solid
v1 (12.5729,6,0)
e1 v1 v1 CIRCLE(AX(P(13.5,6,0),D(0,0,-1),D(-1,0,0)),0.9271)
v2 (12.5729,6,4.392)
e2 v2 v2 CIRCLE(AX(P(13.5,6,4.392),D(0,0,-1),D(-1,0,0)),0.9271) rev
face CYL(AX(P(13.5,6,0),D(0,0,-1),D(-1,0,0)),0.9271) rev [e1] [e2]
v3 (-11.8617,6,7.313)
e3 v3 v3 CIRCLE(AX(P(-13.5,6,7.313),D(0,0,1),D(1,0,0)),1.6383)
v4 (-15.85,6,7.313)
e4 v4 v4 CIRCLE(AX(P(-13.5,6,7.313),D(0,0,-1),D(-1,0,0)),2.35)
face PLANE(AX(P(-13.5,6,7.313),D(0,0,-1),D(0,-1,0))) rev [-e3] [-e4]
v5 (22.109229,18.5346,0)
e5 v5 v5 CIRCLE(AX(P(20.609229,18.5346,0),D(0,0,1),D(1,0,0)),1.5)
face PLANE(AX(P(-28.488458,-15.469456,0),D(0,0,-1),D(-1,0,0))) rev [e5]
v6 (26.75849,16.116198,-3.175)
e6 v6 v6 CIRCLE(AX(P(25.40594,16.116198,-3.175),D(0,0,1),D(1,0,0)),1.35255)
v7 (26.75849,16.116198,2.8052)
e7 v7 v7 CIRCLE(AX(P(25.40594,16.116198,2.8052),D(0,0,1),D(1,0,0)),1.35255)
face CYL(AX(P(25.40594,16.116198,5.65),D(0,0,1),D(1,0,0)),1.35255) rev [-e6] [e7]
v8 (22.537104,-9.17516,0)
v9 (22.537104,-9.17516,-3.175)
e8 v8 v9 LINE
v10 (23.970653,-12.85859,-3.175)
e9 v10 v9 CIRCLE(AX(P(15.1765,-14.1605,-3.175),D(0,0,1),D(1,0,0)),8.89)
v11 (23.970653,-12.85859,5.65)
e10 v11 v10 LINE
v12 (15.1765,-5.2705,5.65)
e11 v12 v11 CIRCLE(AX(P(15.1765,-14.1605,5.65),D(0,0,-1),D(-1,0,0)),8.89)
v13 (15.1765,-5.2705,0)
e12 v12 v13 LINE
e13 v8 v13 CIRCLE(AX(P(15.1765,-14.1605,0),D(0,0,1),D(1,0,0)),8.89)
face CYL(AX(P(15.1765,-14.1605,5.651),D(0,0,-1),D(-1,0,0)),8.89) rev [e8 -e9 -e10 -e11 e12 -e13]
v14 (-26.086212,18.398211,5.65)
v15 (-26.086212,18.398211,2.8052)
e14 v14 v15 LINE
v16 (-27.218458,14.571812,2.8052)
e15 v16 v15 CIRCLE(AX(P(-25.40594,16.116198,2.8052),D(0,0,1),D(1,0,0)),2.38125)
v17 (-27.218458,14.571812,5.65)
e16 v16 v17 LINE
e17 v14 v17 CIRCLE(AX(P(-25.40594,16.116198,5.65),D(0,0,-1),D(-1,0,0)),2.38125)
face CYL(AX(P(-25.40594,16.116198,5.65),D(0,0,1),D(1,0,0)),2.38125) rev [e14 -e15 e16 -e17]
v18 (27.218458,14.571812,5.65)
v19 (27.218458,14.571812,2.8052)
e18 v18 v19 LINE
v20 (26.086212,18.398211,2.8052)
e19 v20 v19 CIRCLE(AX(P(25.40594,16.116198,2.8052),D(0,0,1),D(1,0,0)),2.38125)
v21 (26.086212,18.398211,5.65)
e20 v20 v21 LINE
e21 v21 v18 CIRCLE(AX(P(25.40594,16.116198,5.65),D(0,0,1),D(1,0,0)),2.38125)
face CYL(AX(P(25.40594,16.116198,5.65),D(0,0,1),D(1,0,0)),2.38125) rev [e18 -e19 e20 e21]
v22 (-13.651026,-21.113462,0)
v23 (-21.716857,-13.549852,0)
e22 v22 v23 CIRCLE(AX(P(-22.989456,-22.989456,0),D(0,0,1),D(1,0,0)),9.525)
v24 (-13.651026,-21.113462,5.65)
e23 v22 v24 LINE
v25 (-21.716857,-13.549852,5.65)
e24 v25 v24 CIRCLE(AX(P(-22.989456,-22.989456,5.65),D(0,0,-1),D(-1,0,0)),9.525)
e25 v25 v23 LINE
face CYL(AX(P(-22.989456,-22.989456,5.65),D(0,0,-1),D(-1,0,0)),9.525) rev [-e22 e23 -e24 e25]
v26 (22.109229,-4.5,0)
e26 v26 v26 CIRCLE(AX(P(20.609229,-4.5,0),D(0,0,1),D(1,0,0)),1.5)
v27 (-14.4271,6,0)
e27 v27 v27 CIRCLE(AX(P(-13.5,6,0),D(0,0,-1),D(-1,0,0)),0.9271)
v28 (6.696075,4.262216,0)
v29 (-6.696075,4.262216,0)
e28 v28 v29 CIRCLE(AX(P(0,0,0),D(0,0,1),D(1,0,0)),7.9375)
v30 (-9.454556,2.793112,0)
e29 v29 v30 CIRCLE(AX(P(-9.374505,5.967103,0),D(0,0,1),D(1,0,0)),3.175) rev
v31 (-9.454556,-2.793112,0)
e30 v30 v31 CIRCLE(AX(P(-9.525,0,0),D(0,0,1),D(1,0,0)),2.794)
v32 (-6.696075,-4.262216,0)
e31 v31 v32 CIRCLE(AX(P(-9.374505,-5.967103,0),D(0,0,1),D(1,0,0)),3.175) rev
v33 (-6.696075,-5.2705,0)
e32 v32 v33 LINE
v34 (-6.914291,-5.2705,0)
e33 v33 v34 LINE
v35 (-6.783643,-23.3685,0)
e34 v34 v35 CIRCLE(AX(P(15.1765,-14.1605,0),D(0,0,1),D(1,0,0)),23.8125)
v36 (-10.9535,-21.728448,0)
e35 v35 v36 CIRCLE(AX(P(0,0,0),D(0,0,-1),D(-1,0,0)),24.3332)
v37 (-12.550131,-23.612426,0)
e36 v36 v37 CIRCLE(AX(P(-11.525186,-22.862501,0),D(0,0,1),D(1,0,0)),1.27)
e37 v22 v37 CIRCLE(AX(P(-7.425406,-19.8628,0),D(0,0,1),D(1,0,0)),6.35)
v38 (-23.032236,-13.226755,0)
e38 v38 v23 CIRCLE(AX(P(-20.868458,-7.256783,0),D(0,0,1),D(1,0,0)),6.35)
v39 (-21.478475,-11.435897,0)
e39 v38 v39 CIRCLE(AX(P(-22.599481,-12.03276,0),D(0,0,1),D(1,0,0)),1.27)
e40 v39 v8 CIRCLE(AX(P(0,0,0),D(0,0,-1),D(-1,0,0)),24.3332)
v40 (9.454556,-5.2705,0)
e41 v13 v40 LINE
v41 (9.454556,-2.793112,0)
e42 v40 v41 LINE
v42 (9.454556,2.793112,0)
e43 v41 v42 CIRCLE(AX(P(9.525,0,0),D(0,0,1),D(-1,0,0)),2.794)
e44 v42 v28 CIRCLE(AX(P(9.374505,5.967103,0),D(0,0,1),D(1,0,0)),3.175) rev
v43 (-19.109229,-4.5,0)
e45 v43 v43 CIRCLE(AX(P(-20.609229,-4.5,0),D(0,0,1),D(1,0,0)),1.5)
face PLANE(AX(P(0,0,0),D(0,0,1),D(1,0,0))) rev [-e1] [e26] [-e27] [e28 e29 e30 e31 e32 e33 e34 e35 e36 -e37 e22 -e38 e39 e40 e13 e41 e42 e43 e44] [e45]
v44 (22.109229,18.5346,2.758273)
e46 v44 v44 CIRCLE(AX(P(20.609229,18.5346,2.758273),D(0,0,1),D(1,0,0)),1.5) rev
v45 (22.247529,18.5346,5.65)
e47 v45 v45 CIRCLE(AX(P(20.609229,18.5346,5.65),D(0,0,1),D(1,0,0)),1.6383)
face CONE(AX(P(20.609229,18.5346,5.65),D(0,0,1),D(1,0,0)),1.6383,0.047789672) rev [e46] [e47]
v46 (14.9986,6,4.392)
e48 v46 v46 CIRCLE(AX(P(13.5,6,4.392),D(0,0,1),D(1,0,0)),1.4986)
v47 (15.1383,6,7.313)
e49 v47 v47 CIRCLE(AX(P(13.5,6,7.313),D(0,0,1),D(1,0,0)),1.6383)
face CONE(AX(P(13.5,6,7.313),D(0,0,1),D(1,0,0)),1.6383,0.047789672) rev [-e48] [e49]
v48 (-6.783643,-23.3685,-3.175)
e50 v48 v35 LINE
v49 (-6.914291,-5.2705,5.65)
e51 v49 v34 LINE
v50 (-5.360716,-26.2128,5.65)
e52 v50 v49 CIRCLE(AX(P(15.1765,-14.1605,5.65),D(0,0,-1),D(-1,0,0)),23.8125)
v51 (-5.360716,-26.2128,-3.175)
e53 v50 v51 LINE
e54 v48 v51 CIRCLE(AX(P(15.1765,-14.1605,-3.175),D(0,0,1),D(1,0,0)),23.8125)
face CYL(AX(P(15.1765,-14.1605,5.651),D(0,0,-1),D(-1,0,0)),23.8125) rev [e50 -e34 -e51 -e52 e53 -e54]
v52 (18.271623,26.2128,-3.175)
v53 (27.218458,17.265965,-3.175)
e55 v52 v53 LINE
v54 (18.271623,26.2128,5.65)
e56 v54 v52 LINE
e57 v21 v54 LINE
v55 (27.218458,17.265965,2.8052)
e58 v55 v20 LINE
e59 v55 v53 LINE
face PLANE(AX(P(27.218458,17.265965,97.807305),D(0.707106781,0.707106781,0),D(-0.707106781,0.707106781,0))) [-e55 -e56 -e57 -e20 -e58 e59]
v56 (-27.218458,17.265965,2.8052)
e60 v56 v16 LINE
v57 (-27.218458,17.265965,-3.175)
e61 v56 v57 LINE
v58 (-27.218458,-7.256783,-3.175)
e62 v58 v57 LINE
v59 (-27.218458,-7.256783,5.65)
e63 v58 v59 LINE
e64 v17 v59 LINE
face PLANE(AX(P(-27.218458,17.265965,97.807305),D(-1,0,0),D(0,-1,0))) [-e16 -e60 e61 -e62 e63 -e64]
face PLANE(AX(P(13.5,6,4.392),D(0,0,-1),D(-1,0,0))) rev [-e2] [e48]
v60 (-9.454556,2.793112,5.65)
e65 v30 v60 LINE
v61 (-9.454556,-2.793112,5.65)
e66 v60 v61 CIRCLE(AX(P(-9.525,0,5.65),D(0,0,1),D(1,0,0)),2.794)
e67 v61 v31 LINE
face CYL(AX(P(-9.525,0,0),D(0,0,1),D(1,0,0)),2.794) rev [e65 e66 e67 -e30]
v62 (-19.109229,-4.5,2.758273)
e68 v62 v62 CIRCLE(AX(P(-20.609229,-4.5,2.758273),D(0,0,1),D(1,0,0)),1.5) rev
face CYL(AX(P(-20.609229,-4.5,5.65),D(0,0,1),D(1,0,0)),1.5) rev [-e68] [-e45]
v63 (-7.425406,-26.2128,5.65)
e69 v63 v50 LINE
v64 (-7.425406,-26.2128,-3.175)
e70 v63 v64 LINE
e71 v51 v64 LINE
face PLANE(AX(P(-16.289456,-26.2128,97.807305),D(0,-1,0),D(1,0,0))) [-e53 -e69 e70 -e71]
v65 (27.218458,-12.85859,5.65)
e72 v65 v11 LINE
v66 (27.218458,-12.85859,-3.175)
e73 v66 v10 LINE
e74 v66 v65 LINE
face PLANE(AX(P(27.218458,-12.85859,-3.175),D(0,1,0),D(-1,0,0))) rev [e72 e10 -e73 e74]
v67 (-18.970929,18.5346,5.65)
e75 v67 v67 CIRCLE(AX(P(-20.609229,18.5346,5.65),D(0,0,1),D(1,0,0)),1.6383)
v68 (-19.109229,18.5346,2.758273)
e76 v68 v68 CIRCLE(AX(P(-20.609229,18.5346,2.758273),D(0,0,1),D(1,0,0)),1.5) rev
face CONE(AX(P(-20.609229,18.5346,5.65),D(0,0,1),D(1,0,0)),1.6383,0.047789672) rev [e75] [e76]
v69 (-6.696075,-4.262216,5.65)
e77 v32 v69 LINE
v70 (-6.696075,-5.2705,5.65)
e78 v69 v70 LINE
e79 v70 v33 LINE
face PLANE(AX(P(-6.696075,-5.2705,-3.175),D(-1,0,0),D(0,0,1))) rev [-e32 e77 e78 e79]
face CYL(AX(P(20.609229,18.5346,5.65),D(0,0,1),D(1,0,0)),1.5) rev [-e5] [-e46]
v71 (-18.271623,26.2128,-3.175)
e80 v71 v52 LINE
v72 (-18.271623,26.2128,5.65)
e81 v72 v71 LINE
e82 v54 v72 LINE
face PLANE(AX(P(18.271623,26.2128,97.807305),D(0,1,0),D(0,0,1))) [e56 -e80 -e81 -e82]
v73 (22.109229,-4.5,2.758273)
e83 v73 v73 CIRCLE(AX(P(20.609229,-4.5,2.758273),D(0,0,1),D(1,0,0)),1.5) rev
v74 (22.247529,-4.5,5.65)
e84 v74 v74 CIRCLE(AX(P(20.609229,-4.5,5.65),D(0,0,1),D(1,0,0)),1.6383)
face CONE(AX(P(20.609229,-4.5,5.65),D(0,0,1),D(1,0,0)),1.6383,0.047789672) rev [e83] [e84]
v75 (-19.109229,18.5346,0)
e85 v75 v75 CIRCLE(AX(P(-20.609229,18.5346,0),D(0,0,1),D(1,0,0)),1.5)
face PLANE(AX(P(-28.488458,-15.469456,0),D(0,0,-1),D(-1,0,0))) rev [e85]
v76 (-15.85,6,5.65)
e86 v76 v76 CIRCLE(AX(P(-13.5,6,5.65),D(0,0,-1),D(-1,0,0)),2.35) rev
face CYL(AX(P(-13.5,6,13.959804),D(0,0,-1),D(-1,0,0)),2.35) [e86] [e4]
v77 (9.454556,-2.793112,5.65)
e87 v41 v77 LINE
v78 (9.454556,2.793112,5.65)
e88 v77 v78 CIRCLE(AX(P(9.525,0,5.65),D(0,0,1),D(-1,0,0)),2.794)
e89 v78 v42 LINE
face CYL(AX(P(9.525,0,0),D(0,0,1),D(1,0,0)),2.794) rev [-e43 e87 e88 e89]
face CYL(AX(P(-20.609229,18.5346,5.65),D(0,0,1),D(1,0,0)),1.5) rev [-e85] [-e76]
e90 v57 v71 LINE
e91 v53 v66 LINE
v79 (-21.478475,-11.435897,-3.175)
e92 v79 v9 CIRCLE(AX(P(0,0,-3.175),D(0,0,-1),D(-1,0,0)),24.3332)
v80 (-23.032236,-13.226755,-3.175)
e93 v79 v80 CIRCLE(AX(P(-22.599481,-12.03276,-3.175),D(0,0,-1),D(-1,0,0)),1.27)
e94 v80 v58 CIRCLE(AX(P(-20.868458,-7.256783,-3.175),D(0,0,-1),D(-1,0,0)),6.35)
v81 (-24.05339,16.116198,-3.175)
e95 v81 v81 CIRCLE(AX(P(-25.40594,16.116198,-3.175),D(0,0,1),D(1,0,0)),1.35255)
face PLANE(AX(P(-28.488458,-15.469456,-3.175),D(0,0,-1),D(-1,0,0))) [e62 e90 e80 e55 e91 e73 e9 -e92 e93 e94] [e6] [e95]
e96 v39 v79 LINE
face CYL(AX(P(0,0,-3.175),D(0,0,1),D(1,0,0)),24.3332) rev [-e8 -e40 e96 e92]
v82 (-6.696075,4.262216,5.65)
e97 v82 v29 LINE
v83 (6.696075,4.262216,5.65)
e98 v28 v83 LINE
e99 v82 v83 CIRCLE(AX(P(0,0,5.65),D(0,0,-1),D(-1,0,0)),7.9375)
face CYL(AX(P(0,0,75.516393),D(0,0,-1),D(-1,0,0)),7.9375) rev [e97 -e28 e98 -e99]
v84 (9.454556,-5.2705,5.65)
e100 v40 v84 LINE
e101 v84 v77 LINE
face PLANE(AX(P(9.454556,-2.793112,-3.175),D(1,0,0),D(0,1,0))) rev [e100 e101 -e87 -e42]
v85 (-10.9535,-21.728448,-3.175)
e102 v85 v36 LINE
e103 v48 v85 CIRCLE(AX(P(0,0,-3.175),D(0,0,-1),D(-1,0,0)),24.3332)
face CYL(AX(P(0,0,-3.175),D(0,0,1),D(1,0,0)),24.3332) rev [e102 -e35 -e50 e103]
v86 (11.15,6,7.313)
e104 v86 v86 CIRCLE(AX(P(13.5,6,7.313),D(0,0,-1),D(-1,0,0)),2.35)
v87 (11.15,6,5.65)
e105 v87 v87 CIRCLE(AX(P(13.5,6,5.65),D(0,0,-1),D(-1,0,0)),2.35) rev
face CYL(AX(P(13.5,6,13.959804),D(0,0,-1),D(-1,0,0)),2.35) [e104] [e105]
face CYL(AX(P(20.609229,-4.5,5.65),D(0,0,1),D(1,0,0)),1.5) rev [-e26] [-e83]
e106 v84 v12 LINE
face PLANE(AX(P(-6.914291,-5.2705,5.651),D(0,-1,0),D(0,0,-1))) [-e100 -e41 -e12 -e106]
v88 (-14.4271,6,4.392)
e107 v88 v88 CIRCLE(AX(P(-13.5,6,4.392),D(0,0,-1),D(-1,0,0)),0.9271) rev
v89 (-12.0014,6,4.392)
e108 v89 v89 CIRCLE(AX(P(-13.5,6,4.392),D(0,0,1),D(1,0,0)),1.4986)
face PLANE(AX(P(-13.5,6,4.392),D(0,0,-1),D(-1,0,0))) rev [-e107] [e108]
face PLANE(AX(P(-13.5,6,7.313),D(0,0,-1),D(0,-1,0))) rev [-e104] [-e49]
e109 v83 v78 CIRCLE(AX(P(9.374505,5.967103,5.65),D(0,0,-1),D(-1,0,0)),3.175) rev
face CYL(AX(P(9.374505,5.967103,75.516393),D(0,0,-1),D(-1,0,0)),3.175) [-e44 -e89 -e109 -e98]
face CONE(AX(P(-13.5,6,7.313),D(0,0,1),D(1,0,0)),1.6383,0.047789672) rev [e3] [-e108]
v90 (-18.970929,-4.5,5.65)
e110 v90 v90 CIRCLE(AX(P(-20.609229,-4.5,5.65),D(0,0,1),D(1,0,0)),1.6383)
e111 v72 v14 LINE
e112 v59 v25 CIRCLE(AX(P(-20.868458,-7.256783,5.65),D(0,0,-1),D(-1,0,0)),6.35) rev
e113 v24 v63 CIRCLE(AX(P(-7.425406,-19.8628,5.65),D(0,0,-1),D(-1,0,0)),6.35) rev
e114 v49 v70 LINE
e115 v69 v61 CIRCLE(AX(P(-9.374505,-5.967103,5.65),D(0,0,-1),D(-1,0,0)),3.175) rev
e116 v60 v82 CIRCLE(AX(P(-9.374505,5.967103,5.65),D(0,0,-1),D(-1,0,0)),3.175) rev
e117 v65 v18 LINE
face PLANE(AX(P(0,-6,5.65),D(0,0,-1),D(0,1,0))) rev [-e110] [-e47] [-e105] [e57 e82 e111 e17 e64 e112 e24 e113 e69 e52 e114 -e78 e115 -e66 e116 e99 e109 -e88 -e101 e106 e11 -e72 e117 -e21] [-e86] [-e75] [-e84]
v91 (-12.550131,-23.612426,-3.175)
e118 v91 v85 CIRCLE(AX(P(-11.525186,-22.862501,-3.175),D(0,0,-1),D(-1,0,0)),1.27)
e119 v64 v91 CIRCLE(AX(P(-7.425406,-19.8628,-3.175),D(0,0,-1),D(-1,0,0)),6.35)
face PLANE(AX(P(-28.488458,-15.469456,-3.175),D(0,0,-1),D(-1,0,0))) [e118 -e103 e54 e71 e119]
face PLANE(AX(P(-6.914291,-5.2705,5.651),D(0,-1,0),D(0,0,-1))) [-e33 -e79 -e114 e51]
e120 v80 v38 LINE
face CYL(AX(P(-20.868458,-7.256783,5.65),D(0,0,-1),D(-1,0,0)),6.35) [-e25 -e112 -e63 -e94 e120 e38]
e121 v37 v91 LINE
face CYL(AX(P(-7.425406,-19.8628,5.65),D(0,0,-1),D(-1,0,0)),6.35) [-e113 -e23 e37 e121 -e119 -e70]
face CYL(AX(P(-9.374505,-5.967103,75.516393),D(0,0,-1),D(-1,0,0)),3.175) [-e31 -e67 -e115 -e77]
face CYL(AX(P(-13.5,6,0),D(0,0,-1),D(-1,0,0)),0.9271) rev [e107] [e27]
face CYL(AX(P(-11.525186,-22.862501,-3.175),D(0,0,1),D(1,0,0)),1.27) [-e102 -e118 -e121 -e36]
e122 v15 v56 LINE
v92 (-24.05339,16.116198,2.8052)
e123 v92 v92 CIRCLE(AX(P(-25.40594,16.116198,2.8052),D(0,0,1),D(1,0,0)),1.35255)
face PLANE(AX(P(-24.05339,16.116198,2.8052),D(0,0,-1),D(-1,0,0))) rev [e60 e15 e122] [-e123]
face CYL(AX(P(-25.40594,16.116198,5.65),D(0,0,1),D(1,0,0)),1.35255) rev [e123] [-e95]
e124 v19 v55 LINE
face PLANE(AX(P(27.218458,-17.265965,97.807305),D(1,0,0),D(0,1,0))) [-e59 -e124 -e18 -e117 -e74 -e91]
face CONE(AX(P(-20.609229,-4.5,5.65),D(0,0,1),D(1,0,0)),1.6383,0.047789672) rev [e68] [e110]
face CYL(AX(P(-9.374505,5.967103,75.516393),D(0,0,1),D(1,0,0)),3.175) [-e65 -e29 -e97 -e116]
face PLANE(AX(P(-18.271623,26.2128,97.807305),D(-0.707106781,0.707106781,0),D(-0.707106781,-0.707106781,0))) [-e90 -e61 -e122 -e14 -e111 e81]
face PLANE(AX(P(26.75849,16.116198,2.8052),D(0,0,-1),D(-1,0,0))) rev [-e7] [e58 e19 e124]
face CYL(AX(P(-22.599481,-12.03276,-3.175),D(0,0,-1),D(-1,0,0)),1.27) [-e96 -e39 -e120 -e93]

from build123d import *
from build123d.topology import SkipClean

# Parameters (mm, degrees)
SKETCH1_R                                       = 24.7015
SKETCH1_R_2                                     = 7.9375
BOSS_EXTRUDE1_DEPTH                             = 5.65
CBORE_SLOT_FOR_2_PAN_HEAD_MACHINE_SCREW_DEPTH   = 7
CBORE_SLOT_FOR_2_PAN_HEAD_MACHINE_S_3_DEPTH     = 1.5748
BOSS_EXTRUDE5_DEPTH                             = 12.7
BOSS_EXTRUDE7_DEPTH                             = 12.7
SKETCH32_R                                      = 24.7015
BOSS_EXTRUDE8_DEPTH                             = 18.35
CUT_EXTRUDE1_DEPTH                              = 12.7
CUT_EXTRUDE2_START                              = -12.7
CUT_EXTRUDE2_DEPTH                              = 12.7
CUT_EXTRUDE3_START                              = -12.7
CUT_EXTRUDE3_DEPTH                              = 12.7
HOLE1_AT_2_COUNT                                = 2
HOLE1_AT_2_PITCH                                = 23.0346
HOLE1_AT_3_COUNT                                = 2
HOLE1_AT_3_PITCH                                = 41.21845798
HOLE1_AT_4_COUNT                                = 2
HOLE1_AT_4_PITCH                                = 47.218154088
F_3_0_3_DIAMETER_HOLE1_D                        = 3
SKETCH44_R                                      = 2.794
CUT_EXTRUDE4_DEPTH                              = 43.051540364
FILLET1_R                                       = 1.27
CUT_EXTRUDE5_DEPTH                              = 43.051540364
SKETCH46_R                                      = 24.3332
BOSS_EXTRUDE9_DEPTH                             = 3.175
FILLET3_R                                       = 3.175
BOSS_EXTRUDE10_DEPTH                            = 8.825
FILLET2_R                                       = 1.27
SKETCH48_R                                      = 9.525
CUT_EXTRUDE6_DEPTH                              = 43.594485375
FILLET4_R                                       = 6.35
FILLET5_R                                       = 1.27
CBORE_FOR_2_PAN_HEAD_MACHINE_SCREW1_D           = 2.7051
CBORE_FOR_2_PAN_HEAD_MACHINE_SCREW1_CBORE_D     = 4.7625
CBORE_FOR_2_PAN_HEAD_MACHINE_SCREW1_CBORE_DEPTH = 2.8448
CUT_EXTRUDE7_REACH                              = 40.805
SKETCH52_W                                      = 3.519428238
SKETCH52_H                                      = 2.477388191
SKETCH52_W_2                                    = 0.760947706
SKETCH52_H_2                                    = 1.008283928
SKETCH52_W_3                                    = 24.09425798
SKETCH52_H_3                                    = 13.354210358
CUT_EXTRUDE8_DEPTH                              = 39.805102427
SKETCH53_R                                      = 2.35
BOSS_EXTRUDE11_DEPTH                            = 1.663
BOSS_EXTRUDE12_DEPTH                            = 5.65
F_0_CLEARANCE_HOLE1_D                           = 1.8542
HOLE2_AT_2_COUNT                                = 2
HOLE2_AT_2_PITCH                                = 27


with BuildPart() as part:
    # Sketch1 → Boss-Extrude1 (new body)
    with BuildSketch(Plane.XY):
        with Locations(Location((0, 0, 0), (0, 0, 180))):
            Circle(SKETCH1_R)
        with Locations(Location((0, 0, 0), (0, 0, 180))):
            Circle(SKETCH1_R_2, mode=Mode.SUBTRACT)
    extrude(amount=BOSS_EXTRUDE1_DEPTH)

    # CBORE SLOT for #2 Pan Head Machine Screw1: read off the stored shape, not the designer's step
    # CBORE SLOT for _2 Pan Head Machine S 2 → CBORE SLOT for #2 Pan Head Machine Screw1 (cut)
    with BuildSketch(Plane.XY):
        with BuildLine():
            ThreePointArc((-6.14045, 18.210667628), (-7.493, 19.563217628), (-8.84555, 18.210667628))
            Line((-8.84555, 18.210667628), (-8.84555, 14.565767628))
            ThreePointArc((-8.84555, 14.565767628), (-7.493, 13.213217628), (-6.14045, 14.565767628))
            Line((-6.14045, 14.565767628), (-6.14045, 18.210667628))
        make_face()
        with BuildLine():
            ThreePointArc((3.35915, 18.210667628), (2.0066, 19.563217628), (0.65405, 18.210667628))
            Line((0.65405, 18.210667628), (0.65405, 14.565767628))
            ThreePointArc((0.65405, 14.565767628), (2.0066, 13.213217628), (3.35915, 14.565767628))
            Line((3.35915, 14.565767628), (3.35915, 18.210667628))
        make_face()
    extrude(amount=CBORE_SLOT_FOR_2_PAN_HEAD_MACHINE_SCREW_DEPTH, mode=Mode.SUBTRACT)

    # CBORE SLOT for _2 Pan Head Machine S 3 o → CBORE SLOT for _2 Pan Head Machine S 3 (cut)
    # profile 1 of 2: a face of its own
    with BuildSketch(Plane.XY):
        with BuildLine():
            ThreePointArc((-5.11175, 18.210667628), (-7.493, 20.591917628), (-9.87425, 18.210667628))
            Line((-9.87425, 18.210667628), (-9.87425, 14.565767628))
            ThreePointArc((-9.87425, 14.565767628), (-7.493, 12.184517628), (-5.11175, 14.565767628))
            Line((-5.11175, 14.565767628), (-5.11175, 18.210667628))
        make_face()
        with BuildLine():
            Line((-8.84555, 14.565767628), (-8.84555, 18.210667628))
            ThreePointArc((-8.84555, 18.210667628), (-7.493, 19.563217628), (-6.14045, 18.210667628))
            Line((-6.14045, 18.210667628), (-6.14045, 14.565767628))
            ThreePointArc((-6.14045, 14.565767628), (-7.493, 13.213217628), (-8.84555, 14.565767628))
        make_face(mode=Mode.SUBTRACT)
    # profile 2 of 2: a face of its own
    with BuildSketch(Plane.XY):
        with BuildLine():
            ThreePointArc((4.38785, 18.210667628), (2.0066, 20.591917628), (-0.37465, 18.210667628))
            Line((-0.37465, 18.210667628), (-0.37465, 14.565767628))
            ThreePointArc((-0.37465, 14.565767628), (2.0066, 12.184517628), (4.38785, 14.565767628))
            Line((4.38785, 14.565767628), (4.38785, 18.210667628))
        make_face()
        with BuildLine():
            Line((0.65405, 14.565767628), (0.65405, 18.210667628))
            ThreePointArc((0.65405, 18.210667628), (2.0066, 19.563217628), (3.35915, 18.210667628))
            Line((3.35915, 18.210667628), (3.35915, 14.565767628))
            ThreePointArc((3.35915, 14.565767628), (2.0066, 13.213217628), (0.65405, 14.565767628))
        make_face(mode=Mode.SUBTRACT)
    extrude(amount=CBORE_SLOT_FOR_2_PAN_HEAD_MACHINE_S_3_DEPTH, mode=Mode.SUBTRACT)

    # CBORE SLOT for _2 Pan Head Machine S 4: loft between two sections, ruled curve by curve
    cbore_slot_for_2_pan_head_machine_s_4_from = [
        Edge.make_three_point_arc((-9.87425, 18.210667628, 1.03251), (-9.176798023, 19.89446565, 1.03251), (-7.493, 20.591917628, 1.03251)),
        Edge.make_three_point_arc((-7.493, 20.591917628, 1.03251), (-5.809201977, 19.89446565, 1.03251), (-5.11175, 18.210667628, 1.03251)),
        Edge.make_three_point_arc((-5.11175, 14.565767628, 1.03251), (-5.809201977, 12.881969605, 1.03251), (-7.493, 12.184517628, 1.03251)),
        Edge.make_three_point_arc((-7.493, 12.184517628, 1.03251), (-9.176798023, 12.881969605, 1.03251), (-9.87425, 14.565767628, 1.03251)),
        Edge.make_line((-5.11175, 18.210667628, 1.03251), (-5.11175, 14.565767628, 1.03251)),
        Edge.make_line((-9.87425, 18.210667628, 1.03251), (-9.87425, 14.565767628, 1.03251)),
    ]
    cbore_slot_for_2_pan_head_machine_s_4_to = [
        Edge.make_three_point_arc((-10.90676, 18.210667628, 0), (-9.906892845, 20.624560473, 0), (-7.493, 21.624427628, 0)),
        Edge.make_three_point_arc((-7.493, 21.624427628, 0), (-5.079107155, 20.624560473, 0), (-4.07924, 18.210667628, 0)),
        Edge.make_three_point_arc((-4.07924, 14.565767628, 0), (-5.079107155, 12.151874782, 0), (-7.493, 11.152007628, 0)),
        Edge.make_three_point_arc((-7.493, 11.152007628, 0), (-9.906892845, 12.151874782, 0), (-10.90676, 14.565767628, 0)),
        Edge.make_line((-4.07924, 18.210667628, 0), (-4.07924, 14.565767628, 0)),
        Edge.make_line((-10.90676, 18.210667628, 0), (-10.90676, 14.565767628, 0)),
    ]
    cbore_slot_for_2_pan_head_machine_s_4 = Solid(Shell([*[Face.make_surface_from_curves(cbore_slot_for_2_pan_head_machine_s_4_from[k], cbore_slot_for_2_pan_head_machine_s_4_to[k]) for k in range(6)], Face(Wire(cbore_slot_for_2_pan_head_machine_s_4_from)), Face(Wire(cbore_slot_for_2_pan_head_machine_s_4_to))]))
    add(cbore_slot_for_2_pan_head_machine_s_4, mode=Mode.SUBTRACT)

    # CBORE SLOT for _2 Pan Head Machine S 5: loft between two sections, ruled curve by curve
    cbore_slot_for_2_pan_head_machine_s_5_from = [
        Edge.make_three_point_arc((-0.37465, 18.210667628, 1.03251), (0.322801977, 19.89446565, 1.03251), (2.0066, 20.591917628, 1.03251)),
        Edge.make_three_point_arc((2.0066, 20.591917628, 1.03251), (3.690398023, 19.89446565, 1.03251), (4.38785, 18.210667628, 1.03251)),
        Edge.make_three_point_arc((4.38785, 14.565767628, 1.03251), (3.690398023, 12.881969605, 1.03251), (2.0066, 12.184517628, 1.03251)),
        Edge.make_three_point_arc((2.0066, 12.184517628, 1.03251), (0.322801977, 12.881969605, 1.03251), (-0.37465, 14.565767628, 1.03251)),
        Edge.make_line((4.38785, 18.210667628, 1.03251), (4.38785, 14.565767628, 1.03251)),
        Edge.make_line((-0.37465, 18.210667628, 1.03251), (-0.37465, 14.565767628, 1.03251)),
    ]
    cbore_slot_for_2_pan_head_machine_s_5_to = [
        Edge.make_three_point_arc((-1.40716, 18.210667628, 0), (-0.407292845, 20.624560473, 0), (2.0066, 21.624427628, 0)),
        Edge.make_three_point_arc((2.0066, 21.624427628, 0), (4.420492845, 20.624560473, 0), (5.42036, 18.210667628, 0)),
        Edge.make_three_point_arc((5.42036, 14.565767628, 0), (4.420492845, 12.151874782, 0), (2.0066, 11.152007628, 0)),
        Edge.make_three_point_arc((2.0066, 11.152007628, 0), (-0.407292845, 12.151874782, 0), (-1.40716, 14.565767628, 0)),
        Edge.make_line((5.42036, 18.210667628, 0), (5.42036, 14.565767628, 0)),
        Edge.make_line((-1.40716, 18.210667628, 0), (-1.40716, 14.565767628, 0)),
    ]
    cbore_slot_for_2_pan_head_machine_s_5 = Solid(Shell([*[Face.make_surface_from_curves(cbore_slot_for_2_pan_head_machine_s_5_from[k], cbore_slot_for_2_pan_head_machine_s_5_to[k]) for k in range(6)], Face(Wire(cbore_slot_for_2_pan_head_machine_s_5_from)), Face(Wire(cbore_slot_for_2_pan_head_machine_s_5_to))]))
    add(cbore_slot_for_2_pan_head_machine_s_5, mode=Mode.SUBTRACT)

    # Sketch11 → Boss-Extrude5 (add)
    with SkipClean():  # the faces are left unmerged after this step: merging them gives an invalid solid
        with BuildSketch(Plane.XY.offset(5.65)):
            with BuildLine():
                Line((-24.288147361, -4.5), (-11.876026271, -4.5))
                ThreePointArc((-11.876026271, -4.5), (0, -12.7), (11.876026271, -4.5))
                Line((11.876026271, -4.5), (24.288147361, -4.5))
                ThreePointArc((24.288147361, -4.5), (0, -24.7015), (-24.288147361, -4.5))
            make_face()
        extrude(amount=BOSS_EXTRUDE5_DEPTH)

    # Sketch17 → Boss-Extrude7 (add)
    with SkipClean():  # the faces are left unmerged after this step: merging them gives an invalid solid
        with BuildSketch(Plane.XY.offset(5.65)):
            with BuildLine():
                Line((-24.288147361, -4.5), (-20.478147361, -4.5))
                Line((-20.478147361, -4.5), (-20.478147361, 4.39))
                ThreePointArc((-20.478147361, 4.39), (-17.953053751, 10.784919117), (-13.493147361, 16.017540187))
                Line((-13.493147361, 16.017540187), (-13.493147361, 20.69055525))
                ThreePointArc((-13.493147361, 20.69055525), (-22.704571702, 9.729672455), (-24.288147361, -4.5))
            make_face()
            with BuildLine():
                Line((20.478147361, -4.5), (20.478147361, 4.39))
                ThreePointArc((20.478147361, 4.39), (17.953053751, 10.784919117), (13.493147361, 16.017540187))
                Line((13.493147361, 16.017540187), (13.493147361, 20.69055525))
                ThreePointArc((13.493147361, 20.69055525), (22.704571702, 9.729672455), (24.288147361, -4.5))
                Line((24.288147361, -4.5), (20.478147361, -4.5))
            make_face()
        extrude(amount=BOSS_EXTRUDE7_DEPTH)

    # Sketch32 → Boss-Extrude8 (add)
    with BuildSketch(Plane(origin=(0, 0, 0), x_dir=(-1, 0, 0), z_dir=(0, 0, -1))):
        Polygon((18.271623193, 26.2128), (27.21845798, 17.265965213), (27.21845798, -16.73945567), (29.68945567, -16.73945567), (29.68945567, -29.23945567), (16.28945567, -29.23945567), (16.28945567, -26.2128), (-18.271623193, -26.2128), (-27.21845798, -17.265965213), (-27.21845798, 17.265965213), (-18.271623193, 26.2128), align=None)
        Circle(SKETCH32_R, mode=Mode.SUBTRACT)
    extrude(amount=-BOSS_EXTRUDE8_DEPTH)

    # Sketch33 → Cut-Extrude1 (cut)
    with BuildSketch(Plane.XY.offset(18.35)):
        Polygon((-13.493147361, 20.69055525), (13.493147361, 20.69055525), (13.493147361, 22.4028), (13.493147361, 26.2128), (-13.493147361, 26.2128), (-13.493147361, 22.4028), align=None)
    extrude(amount=-CUT_EXTRUDE1_DEPTH, mode=Mode.SUBTRACT)

    # Sketch35 → Cut-Extrude2 (cut)
    with BuildSketch(Plane.XY.offset(18.35).offset(CUT_EXTRUDE2_START)):
        with BuildLine():
            Line((-20.478147361, -4.5), (-20.478147361, 4.39))
            ThreePointArc((-20.478147361, 4.39), (-17.953053751, 10.784919117), (-13.493147361, 16.017540187))
            Line((-13.493147361, 16.017540187), (-13.493147361, 25.603122159))
            Line((-13.493147361, 25.603122159), (-23.40845798, 15.68781154))
            Line((-23.40845798, 15.68781154), (-23.40845798, -4.5))
            Line((-23.40845798, -4.5), (-20.478147361, -4.5))
        make_face()
        with BuildLine():
            Line((13.493147361, 25.603122159), (13.493147361, 16.017540187))
            ThreePointArc((13.493147361, 16.017540187), (17.953053751, 10.784919117), (20.478147361, 4.39))
            Line((20.478147361, 4.39), (20.478147361, -4.5))
            Line((20.478147361, -4.5), (23.40845798, -4.5))
            Line((23.40845798, -4.5), (23.40845798, 15.68781154))
            Line((23.40845798, 15.68781154), (13.493147361, 25.603122159))
        make_face()
    extrude(amount=CUT_EXTRUDE2_DEPTH, mode=Mode.SUBTRACT)

    # Sketch37 → Cut-Extrude3 (cut)
    with BuildSketch(Plane.XY.offset(18.35).offset(CUT_EXTRUDE3_START)):
        with BuildLine():
            Line((-23.40845798, 15.68781154), (-13.493147361, 25.603122159))
            Line((-13.493147361, 25.603122159), (-13.493147361, 26.2128))
            Line((-13.493147361, 26.2128), (-18.271623193, 26.2128))
            Line((-18.271623193, 26.2128), (-27.21845798, 17.265965213))
            Line((-27.21845798, 17.265965213), (-27.21845798, -16.73945567))
            Line((-27.21845798, -16.73945567), (-29.68945567, -16.73945567))
            Line((-29.68945567, -16.73945567), (-29.68945567, -29.23945567))
            Line((-29.68945567, -29.23945567), (-16.28945567, -29.23945567))
            Line((-16.28945567, -29.23945567), (-16.28945567, -26.2128))
            Line((-16.28945567, -26.2128), (18.271623193, -26.2128))
            Line((18.271623193, -26.2128), (27.21845798, -17.265965213))
            Line((27.21845798, -17.265965213), (27.21845798, 17.265965213))
            Line((27.21845798, 17.265965213), (18.271623193, 26.2128))
            Line((18.271623193, 26.2128), (13.493147361, 26.2128))
            Line((13.493147361, 26.2128), (13.493147361, 25.603122159))
            Line((13.493147361, 25.603122159), (23.40845798, 15.68781154))
            Line((23.40845798, 15.68781154), (23.40845798, -4.5))
            Line((23.40845798, -4.5), (11.876026271, -4.5))
            ThreePointArc((11.876026271, -4.5), (0, -12.7), (-11.876026271, -4.5))
            Line((-11.876026271, -4.5), (-23.40845798, -4.5))
            Line((-23.40845798, -4.5), (-23.40845798, 15.68781154))
        make_face()
    extrude(amount=CUT_EXTRUDE3_DEPTH, mode=Mode.SUBTRACT)

    # Sketch40 → Hole1 (revolve, cut)
    with BuildSketch(Plane(origin=(-20.60922899, 18.5346, 5.65), x_dir=(0, -1, 0), z_dir=(1, 0, 0))):
        Polygon((0, 0), (0, 2.921), (1.4986, 2.921), (1.6383, 0), align=None)
    hole1 = revolve(axis=Axis((-20.60922899, 18.5346, -104.35), (0, 0, 1)), mode=Mode.SUBTRACT)

    # Hole1 at 2: Hole1 ×2
    with Locations(*[(0, -i * HOLE1_AT_2_PITCH, 0) for i in range(1, HOLE1_AT_2_COUNT)]):
        add(hole1, mode=Mode.SUBTRACT)

    # Hole1 at 3: Hole1 ×2
    with Locations(*[(i * HOLE1_AT_3_PITCH, 0, 0) for i in range(1, HOLE1_AT_3_COUNT)]):
        add(hole1, mode=Mode.SUBTRACT)

    # Hole1 at 4: Hole1 ×2
    with Locations(*[Vector(0.8729366655021837, -0.48783355565390196, 0) * (i * HOLE1_AT_4_PITCH) for i in range(1, HOLE1_AT_4_COUNT)]):
        add(hole1, mode=Mode.SUBTRACT)

    # Ø3.0 (3) Diameter Hole1 (through all)
    with Locations(Plane.XY.offset(5.65)):
        with Locations((-20.60922899, 18.5346), (20.60922899, 18.5346), (-20.60922899, -4.5), (20.60922899, -4.5)):
            Hole(F_3_0_3_DIAMETER_HOLE1_D / 2)

    # Sketch44 → Cut-Extrude4 (cut, through all)
    with BuildSketch(Plane.XY.offset(5.65)):
        with Locations((-9.525, 0)):
            Circle(SKETCH44_R)
        with Locations((9.525, 0)):
            Circle(SKETCH44_R)
    extrude(amount=-CUT_EXTRUDE4_DEPTH, mode=Mode.SUBTRACT)

    # Fillet1
    fillet1_edges = [part.edges().sort_by_distance(p)[0] for p in [
        (-16.28945567, -26.2128, 2.825),
        (-27.21845798, -16.73945567, 2.825),
    ]]
    fillet(fillet1_edges, radius=FILLET1_R)

    # Sketch45 → Cut-Extrude5 (cut, through all)
    with BuildSketch(Plane(origin=(0, 0, 0), x_dir=(-1, 0, 0), z_dir=(0, 0, -1))):
        Polygon((19.525354055, -16.98945567), (16.06125244, -22.98945567), (19.525354055, -28.98945567), (26.453557285, -28.98945567), (29.9176589, -22.98945567), (26.453557285, -16.98945567), align=None)
    extrude(amount=-CUT_EXTRUDE5_DEPTH, mode=Mode.SUBTRACT)

    # Sketch46 → Boss-Extrude9 (add)
    with BuildSketch(Plane(origin=(0, 0, 0), x_dir=(-1, 0, 0), z_dir=(0, 0, -1))):
        with BuildLine():
            Line((19.525354055, -16.98945567), (26.453557285, -16.98945567))
            Line((26.453557285, -16.98945567), (29.68945567, -22.594196081))
            Line((29.68945567, -22.594196081), (29.68945567, -16.73945567))
            Line((29.68945567, -16.73945567), (28.48845798, -16.73945567))
            ThreePointArc((28.48845798, -16.73945567), (27.590432368, -16.367481282), (27.21845798, -15.46945567))
            Line((27.21845798, -15.46945567), (27.21845798, 17.265965213))
            Line((27.21845798, 17.265965213), (18.271623193, 26.2128))
            Line((18.271623193, 26.2128), (-18.271623193, 26.2128))
            Line((-18.271623193, 26.2128), (-27.21845798, 17.265965213))
            Line((-27.21845798, 17.265965213), (-27.21845798, -17.265965213))
            Line((-27.21845798, -17.265965213), (-18.271623193, -26.2128))
            Line((-18.271623193, -26.2128), (15.01945567, -26.2128))
            ThreePointArc((15.01945567, -26.2128), (15.917481282, -26.584774388), (16.28945567, -27.4828))
            Line((16.28945567, -27.4828), (16.28945567, -29.23945567))
            Line((16.28945567, -29.23945567), (29.68945567, -29.23945567))
            Line((29.68945567, -29.23945567), (29.68945567, -23.384715259))
            Line((29.68945567, -23.384715259), (26.453557285, -28.98945567))
            Line((26.453557285, -28.98945567), (19.525354055, -28.98945567))
            Line((19.525354055, -28.98945567), (16.06125244, -22.98945567))
            Line((16.06125244, -22.98945567), (19.525354055, -16.98945567))
        make_face()
        Circle(SKETCH46_R, mode=Mode.SUBTRACT)
    extrude(amount=BOSS_EXTRUDE9_DEPTH)

    # Fillet3
    fillet3_edges = [part.edges().sort_by_distance(p)[0] for p in [
        (-7.660005, -2.080439773, 2.825),
        (-7.660005, 2.080439773, 2.825),
        (7.660005, 2.080439773, 2.825),
        (7.660005, -2.080439773, 2.825),
    ]]
    fillet(fillet3_edges, radius=FILLET3_R)

    # Sketch47 → Boss-Extrude10 (add, through all)
    with BuildSketch(Plane.XY.offset(5.65)):
        Polygon((-29.68945567, -22.594196081), (-29.68945567, -28.98945567), (-19.525354055, -28.98945567), (-16.06125244, -22.98945567), (-19.525354055, -16.98945567), (-26.453557285, -16.98945567), align=None)
    extrude(amount=-BOSS_EXTRUDE10_DEPTH)

    # Fillet2
    fillet2_edges = [part.edges().sort_by_distance(p)[0] for p in [
        (-29.68945567, -16.73945567, 1.2375),
        (-16.28945567, -29.23945567, 1.2375),
        (-29.68945567, -29.23945567, 1.2375),
    ]]
    fillet(fillet2_edges, radius=FILLET2_R)

    # Sketch48 → Cut-Extrude6 (cut, through all)
    with BuildSketch(Plane(origin=(0, 0, -3.175), x_dir=(-1, 0, 0), z_dir=(0, 0, -1))):
        with Locations((22.98945567, -22.98945567)):
            Circle(SKETCH48_R)
    extrude(amount=-CUT_EXTRUDE6_DEPTH, mode=Mode.SUBTRACT)

    # Fillet4
    fillet4_edges = [part.edges().sort_by_distance(p)[0] for p in [
        (-27.21845798, -14.454752133, 1.2375),
        (-14.026438526, -26.2128, 1.2375),
    ]]
    fillet(fillet4_edges, radius=FILLET4_R)

    # Fillet5
    # the kernel refuses this fillet: 1.27 mm, written as the material it takes off along each edge
    with BuildSketch(Plane(origin=(-19.922151482, -13.971846784, -11.170229406), x_dir=(-0.9724814698737868, 0.23298023682733077, 0), z_dir=(0, 0, 1))) as fillet5_piece_1:
        with BuildLine():
            CenterArc((3.055421954, -1.261960905), FILLET5_R, 83.549866432, 137.955138996)
            Line((2.104321709, -2.103571459), (2.009211684, -2.187732514))
            ThreePointArc((2.009211684, -2.187732514), (0.994557133, -1.109409995), (-0.084127135, -0.09514003))
            Line((-0.084127135, -0.09514003), (0.011759624, 0.126454384))
            ThreePointArc((0.011759624, 0.126454384), (1.830812196, 0.134099872), (3.212358743, 0.12619609))
            Line((3.212358743, 0.12619609), (3.198091762, 0))
        make_face()
    extrude(amount=11.170229406, mode=Mode.SUBTRACT)
    with BuildSketch(Plane(origin=(-13.971846784, -19.922151482, -13.061671613), x_dir=(0.3595032559739515, -0.9331438307914421, 0), z_dir=(0, 0, 1))) as fillet5_piece_2:
        with BuildLine():
            CenterArc((3.623351594, 1.22602162), FILLET5_R, 132.177237222, 152.945021751)
            Line((2.770640288, 2.167182301), (2.685369157, 2.261298369))
            ThreePointArc((2.685369157, 2.261298369), (1.346286207, 1.133494196), (-0.070810586, 0.10542704))
            Line((-0.070810586, 0.10542704), (-0.00506165, -0.126899093))
            ThreePointArc((-0.00506165, -0.126899093), (1.205578867, -0.254088239), (3.98780035, -0.122602162))
            Line((3.98780035, -0.122602162), (3.954668645, 0))
        make_face()
    extrude(amount=13.061671613, mode=Mode.SUBTRACT)

    # CBORE for #2 Pan Head Machine Screw1 (through all)
    with Locations(Plane.XY.offset(5.65)):
        with Locations((-25.405939599, 16.116198413), (25.405939599, 16.116198413), (17.204531454, -24.681930955)):
            CounterBoreHole(CBORE_FOR_2_PAN_HEAD_MACHINE_SCREW1_D / 2, CBORE_FOR_2_PAN_HEAD_MACHINE_SCREW1_CBORE_D / 2, CBORE_FOR_2_PAN_HEAD_MACHINE_SCREW1_CBORE_DEPTH)

    # Sketch51 → Cut-Extrude7 (cut, up to next)
    with BuildSketch(Plane.XY.offset(-3.175), mode=Mode.PRIVATE) as cut_extrude7_sk1:
        with BuildLine():
            Line((-6.914291209, -5.2705), (15.1765, -5.2705))
            ThreePointArc((15.1765, -5.2705), (23.389789044, -17.562555714), (8.890320715, -20.446679285))
            Line((8.890320715, -20.446679285), (-1.661480227, -30.998480227))
            ThreePointArc((-1.661480227, -30.998480227), (-8.154692705, -18.923965464), (-6.914291209, -5.2705))
        make_face()
    cut_extrude7_tool1 = extrude(cut_extrude7_sk1.sketch, amount=CUT_EXTRUDE7_REACH, mode=Mode.PRIVATE) & part.part
    add(cut_extrude7_tool1.solids().sort_by_distance((6.304023, -15.146754, -3.175))[0], mode=Mode.SUBTRACT)

    # Sketch52 → Cut-Extrude8 (cut, through all)
    with BuildSketch(Plane.XY.offset(5.65)):
        with Locations((7.694841413, -4.031805905)):
            Rectangle(SKETCH52_W, SKETCH52_H)
        with Locations((-6.315601147, -4.766358036)):
            Rectangle(SKETCH52_W_2, SKETCH52_H_2)
        with Locations((15.17132899, -19.535694821)):
            Rectangle(SKETCH52_W_3, SKETCH52_H_3)
    extrude(amount=-CUT_EXTRUDE8_DEPTH, mode=Mode.SUBTRACT)


with BuildPart() as cut_extrude8_kept_piece:
    # of the separate pieces the step leaves, the one the design keeps (cut_extrude8_pieces_kept)
    add(part.part.solids().sort_by_distance((18.271623193, 26.2128, 5.65))[0])

    # Sketch53 → Boss-Extrude11 (add)
    with BuildSketch(Plane.XY.offset(5.65)):
        with Locations(Location((13.5, 6, 0), (0, 0, 180))):
            Circle(SKETCH53_R)
        with Locations(Location((-13.5, 6, 0), (0, 0, 180))):
            Circle(SKETCH53_R)
    extrude(amount=BOSS_EXTRUDE11_DEPTH)

    # Sketch54 → Boss-Extrude12 (add)
    with BuildSketch(Plane(origin=(0, 0, 0), x_dir=(-1, 0, 0), z_dir=(0, 0, -1))):
        with BuildLine():
            Line((1.40716, 14.565767628), (1.40716, 18.210667628))
            ThreePointArc((1.40716, 18.210667628), (-2.0066, 21.624427628), (-5.42036, 18.210667628))
            Line((-5.42036, 18.210667628), (-5.42036, 14.565767628))
            ThreePointArc((-5.42036, 14.565767628), (-2.0066, 11.152007628), (1.40716, 14.565767628))
        make_face()
        with BuildLine():
            Line((4.07924, 18.210667628), (4.07924, 14.565767628))
            ThreePointArc((4.07924, 14.565767628), (7.493, 11.152007628), (10.90676, 14.565767628))
            Line((10.90676, 14.565767628), (10.90676, 18.210667628))
            ThreePointArc((10.90676, 18.210667628), (7.493, 21.624427628), (4.07924, 18.210667628))
        make_face()
    extrude(amount=-BOSS_EXTRUDE12_DEPTH)

    # #0 Clearance Hole1 (through all)
    with Locations(Plane(origin=(0, 0, 0), x_dir=(-1, 0, 0), z_dir=(0, 0, -1))):
        with Locations((-13.5, 6), (13.5, 6)):
            Hole(F_0_CLEARANCE_HOLE1_D / 2)

    # Sketch58 → Hole2 (revolve, cut)
    with BuildSketch(Plane(origin=(-13.5, 6, 7.313), x_dir=(0, -1, 0), z_dir=(1, 0, 0))):
        Polygon((0, 0), (0, 2.921), (1.4986, 2.921), (1.6383, 0), align=None)
    hole2 = revolve(axis=Axis((-13.5, 6, -102.687), (0, 0, 1)), mode=Mode.SUBTRACT)

    # Hole2 at 2: Hole2 ×2
    with Locations(*[(i * HOLE2_AT_2_PITCH, 0, 0) for i in range(1, HOLE2_AT_2_COUNT)]):
        add(hole2, mode=Mode.SUBTRACT)


solid = cut_extrude8_kept_piece.part
